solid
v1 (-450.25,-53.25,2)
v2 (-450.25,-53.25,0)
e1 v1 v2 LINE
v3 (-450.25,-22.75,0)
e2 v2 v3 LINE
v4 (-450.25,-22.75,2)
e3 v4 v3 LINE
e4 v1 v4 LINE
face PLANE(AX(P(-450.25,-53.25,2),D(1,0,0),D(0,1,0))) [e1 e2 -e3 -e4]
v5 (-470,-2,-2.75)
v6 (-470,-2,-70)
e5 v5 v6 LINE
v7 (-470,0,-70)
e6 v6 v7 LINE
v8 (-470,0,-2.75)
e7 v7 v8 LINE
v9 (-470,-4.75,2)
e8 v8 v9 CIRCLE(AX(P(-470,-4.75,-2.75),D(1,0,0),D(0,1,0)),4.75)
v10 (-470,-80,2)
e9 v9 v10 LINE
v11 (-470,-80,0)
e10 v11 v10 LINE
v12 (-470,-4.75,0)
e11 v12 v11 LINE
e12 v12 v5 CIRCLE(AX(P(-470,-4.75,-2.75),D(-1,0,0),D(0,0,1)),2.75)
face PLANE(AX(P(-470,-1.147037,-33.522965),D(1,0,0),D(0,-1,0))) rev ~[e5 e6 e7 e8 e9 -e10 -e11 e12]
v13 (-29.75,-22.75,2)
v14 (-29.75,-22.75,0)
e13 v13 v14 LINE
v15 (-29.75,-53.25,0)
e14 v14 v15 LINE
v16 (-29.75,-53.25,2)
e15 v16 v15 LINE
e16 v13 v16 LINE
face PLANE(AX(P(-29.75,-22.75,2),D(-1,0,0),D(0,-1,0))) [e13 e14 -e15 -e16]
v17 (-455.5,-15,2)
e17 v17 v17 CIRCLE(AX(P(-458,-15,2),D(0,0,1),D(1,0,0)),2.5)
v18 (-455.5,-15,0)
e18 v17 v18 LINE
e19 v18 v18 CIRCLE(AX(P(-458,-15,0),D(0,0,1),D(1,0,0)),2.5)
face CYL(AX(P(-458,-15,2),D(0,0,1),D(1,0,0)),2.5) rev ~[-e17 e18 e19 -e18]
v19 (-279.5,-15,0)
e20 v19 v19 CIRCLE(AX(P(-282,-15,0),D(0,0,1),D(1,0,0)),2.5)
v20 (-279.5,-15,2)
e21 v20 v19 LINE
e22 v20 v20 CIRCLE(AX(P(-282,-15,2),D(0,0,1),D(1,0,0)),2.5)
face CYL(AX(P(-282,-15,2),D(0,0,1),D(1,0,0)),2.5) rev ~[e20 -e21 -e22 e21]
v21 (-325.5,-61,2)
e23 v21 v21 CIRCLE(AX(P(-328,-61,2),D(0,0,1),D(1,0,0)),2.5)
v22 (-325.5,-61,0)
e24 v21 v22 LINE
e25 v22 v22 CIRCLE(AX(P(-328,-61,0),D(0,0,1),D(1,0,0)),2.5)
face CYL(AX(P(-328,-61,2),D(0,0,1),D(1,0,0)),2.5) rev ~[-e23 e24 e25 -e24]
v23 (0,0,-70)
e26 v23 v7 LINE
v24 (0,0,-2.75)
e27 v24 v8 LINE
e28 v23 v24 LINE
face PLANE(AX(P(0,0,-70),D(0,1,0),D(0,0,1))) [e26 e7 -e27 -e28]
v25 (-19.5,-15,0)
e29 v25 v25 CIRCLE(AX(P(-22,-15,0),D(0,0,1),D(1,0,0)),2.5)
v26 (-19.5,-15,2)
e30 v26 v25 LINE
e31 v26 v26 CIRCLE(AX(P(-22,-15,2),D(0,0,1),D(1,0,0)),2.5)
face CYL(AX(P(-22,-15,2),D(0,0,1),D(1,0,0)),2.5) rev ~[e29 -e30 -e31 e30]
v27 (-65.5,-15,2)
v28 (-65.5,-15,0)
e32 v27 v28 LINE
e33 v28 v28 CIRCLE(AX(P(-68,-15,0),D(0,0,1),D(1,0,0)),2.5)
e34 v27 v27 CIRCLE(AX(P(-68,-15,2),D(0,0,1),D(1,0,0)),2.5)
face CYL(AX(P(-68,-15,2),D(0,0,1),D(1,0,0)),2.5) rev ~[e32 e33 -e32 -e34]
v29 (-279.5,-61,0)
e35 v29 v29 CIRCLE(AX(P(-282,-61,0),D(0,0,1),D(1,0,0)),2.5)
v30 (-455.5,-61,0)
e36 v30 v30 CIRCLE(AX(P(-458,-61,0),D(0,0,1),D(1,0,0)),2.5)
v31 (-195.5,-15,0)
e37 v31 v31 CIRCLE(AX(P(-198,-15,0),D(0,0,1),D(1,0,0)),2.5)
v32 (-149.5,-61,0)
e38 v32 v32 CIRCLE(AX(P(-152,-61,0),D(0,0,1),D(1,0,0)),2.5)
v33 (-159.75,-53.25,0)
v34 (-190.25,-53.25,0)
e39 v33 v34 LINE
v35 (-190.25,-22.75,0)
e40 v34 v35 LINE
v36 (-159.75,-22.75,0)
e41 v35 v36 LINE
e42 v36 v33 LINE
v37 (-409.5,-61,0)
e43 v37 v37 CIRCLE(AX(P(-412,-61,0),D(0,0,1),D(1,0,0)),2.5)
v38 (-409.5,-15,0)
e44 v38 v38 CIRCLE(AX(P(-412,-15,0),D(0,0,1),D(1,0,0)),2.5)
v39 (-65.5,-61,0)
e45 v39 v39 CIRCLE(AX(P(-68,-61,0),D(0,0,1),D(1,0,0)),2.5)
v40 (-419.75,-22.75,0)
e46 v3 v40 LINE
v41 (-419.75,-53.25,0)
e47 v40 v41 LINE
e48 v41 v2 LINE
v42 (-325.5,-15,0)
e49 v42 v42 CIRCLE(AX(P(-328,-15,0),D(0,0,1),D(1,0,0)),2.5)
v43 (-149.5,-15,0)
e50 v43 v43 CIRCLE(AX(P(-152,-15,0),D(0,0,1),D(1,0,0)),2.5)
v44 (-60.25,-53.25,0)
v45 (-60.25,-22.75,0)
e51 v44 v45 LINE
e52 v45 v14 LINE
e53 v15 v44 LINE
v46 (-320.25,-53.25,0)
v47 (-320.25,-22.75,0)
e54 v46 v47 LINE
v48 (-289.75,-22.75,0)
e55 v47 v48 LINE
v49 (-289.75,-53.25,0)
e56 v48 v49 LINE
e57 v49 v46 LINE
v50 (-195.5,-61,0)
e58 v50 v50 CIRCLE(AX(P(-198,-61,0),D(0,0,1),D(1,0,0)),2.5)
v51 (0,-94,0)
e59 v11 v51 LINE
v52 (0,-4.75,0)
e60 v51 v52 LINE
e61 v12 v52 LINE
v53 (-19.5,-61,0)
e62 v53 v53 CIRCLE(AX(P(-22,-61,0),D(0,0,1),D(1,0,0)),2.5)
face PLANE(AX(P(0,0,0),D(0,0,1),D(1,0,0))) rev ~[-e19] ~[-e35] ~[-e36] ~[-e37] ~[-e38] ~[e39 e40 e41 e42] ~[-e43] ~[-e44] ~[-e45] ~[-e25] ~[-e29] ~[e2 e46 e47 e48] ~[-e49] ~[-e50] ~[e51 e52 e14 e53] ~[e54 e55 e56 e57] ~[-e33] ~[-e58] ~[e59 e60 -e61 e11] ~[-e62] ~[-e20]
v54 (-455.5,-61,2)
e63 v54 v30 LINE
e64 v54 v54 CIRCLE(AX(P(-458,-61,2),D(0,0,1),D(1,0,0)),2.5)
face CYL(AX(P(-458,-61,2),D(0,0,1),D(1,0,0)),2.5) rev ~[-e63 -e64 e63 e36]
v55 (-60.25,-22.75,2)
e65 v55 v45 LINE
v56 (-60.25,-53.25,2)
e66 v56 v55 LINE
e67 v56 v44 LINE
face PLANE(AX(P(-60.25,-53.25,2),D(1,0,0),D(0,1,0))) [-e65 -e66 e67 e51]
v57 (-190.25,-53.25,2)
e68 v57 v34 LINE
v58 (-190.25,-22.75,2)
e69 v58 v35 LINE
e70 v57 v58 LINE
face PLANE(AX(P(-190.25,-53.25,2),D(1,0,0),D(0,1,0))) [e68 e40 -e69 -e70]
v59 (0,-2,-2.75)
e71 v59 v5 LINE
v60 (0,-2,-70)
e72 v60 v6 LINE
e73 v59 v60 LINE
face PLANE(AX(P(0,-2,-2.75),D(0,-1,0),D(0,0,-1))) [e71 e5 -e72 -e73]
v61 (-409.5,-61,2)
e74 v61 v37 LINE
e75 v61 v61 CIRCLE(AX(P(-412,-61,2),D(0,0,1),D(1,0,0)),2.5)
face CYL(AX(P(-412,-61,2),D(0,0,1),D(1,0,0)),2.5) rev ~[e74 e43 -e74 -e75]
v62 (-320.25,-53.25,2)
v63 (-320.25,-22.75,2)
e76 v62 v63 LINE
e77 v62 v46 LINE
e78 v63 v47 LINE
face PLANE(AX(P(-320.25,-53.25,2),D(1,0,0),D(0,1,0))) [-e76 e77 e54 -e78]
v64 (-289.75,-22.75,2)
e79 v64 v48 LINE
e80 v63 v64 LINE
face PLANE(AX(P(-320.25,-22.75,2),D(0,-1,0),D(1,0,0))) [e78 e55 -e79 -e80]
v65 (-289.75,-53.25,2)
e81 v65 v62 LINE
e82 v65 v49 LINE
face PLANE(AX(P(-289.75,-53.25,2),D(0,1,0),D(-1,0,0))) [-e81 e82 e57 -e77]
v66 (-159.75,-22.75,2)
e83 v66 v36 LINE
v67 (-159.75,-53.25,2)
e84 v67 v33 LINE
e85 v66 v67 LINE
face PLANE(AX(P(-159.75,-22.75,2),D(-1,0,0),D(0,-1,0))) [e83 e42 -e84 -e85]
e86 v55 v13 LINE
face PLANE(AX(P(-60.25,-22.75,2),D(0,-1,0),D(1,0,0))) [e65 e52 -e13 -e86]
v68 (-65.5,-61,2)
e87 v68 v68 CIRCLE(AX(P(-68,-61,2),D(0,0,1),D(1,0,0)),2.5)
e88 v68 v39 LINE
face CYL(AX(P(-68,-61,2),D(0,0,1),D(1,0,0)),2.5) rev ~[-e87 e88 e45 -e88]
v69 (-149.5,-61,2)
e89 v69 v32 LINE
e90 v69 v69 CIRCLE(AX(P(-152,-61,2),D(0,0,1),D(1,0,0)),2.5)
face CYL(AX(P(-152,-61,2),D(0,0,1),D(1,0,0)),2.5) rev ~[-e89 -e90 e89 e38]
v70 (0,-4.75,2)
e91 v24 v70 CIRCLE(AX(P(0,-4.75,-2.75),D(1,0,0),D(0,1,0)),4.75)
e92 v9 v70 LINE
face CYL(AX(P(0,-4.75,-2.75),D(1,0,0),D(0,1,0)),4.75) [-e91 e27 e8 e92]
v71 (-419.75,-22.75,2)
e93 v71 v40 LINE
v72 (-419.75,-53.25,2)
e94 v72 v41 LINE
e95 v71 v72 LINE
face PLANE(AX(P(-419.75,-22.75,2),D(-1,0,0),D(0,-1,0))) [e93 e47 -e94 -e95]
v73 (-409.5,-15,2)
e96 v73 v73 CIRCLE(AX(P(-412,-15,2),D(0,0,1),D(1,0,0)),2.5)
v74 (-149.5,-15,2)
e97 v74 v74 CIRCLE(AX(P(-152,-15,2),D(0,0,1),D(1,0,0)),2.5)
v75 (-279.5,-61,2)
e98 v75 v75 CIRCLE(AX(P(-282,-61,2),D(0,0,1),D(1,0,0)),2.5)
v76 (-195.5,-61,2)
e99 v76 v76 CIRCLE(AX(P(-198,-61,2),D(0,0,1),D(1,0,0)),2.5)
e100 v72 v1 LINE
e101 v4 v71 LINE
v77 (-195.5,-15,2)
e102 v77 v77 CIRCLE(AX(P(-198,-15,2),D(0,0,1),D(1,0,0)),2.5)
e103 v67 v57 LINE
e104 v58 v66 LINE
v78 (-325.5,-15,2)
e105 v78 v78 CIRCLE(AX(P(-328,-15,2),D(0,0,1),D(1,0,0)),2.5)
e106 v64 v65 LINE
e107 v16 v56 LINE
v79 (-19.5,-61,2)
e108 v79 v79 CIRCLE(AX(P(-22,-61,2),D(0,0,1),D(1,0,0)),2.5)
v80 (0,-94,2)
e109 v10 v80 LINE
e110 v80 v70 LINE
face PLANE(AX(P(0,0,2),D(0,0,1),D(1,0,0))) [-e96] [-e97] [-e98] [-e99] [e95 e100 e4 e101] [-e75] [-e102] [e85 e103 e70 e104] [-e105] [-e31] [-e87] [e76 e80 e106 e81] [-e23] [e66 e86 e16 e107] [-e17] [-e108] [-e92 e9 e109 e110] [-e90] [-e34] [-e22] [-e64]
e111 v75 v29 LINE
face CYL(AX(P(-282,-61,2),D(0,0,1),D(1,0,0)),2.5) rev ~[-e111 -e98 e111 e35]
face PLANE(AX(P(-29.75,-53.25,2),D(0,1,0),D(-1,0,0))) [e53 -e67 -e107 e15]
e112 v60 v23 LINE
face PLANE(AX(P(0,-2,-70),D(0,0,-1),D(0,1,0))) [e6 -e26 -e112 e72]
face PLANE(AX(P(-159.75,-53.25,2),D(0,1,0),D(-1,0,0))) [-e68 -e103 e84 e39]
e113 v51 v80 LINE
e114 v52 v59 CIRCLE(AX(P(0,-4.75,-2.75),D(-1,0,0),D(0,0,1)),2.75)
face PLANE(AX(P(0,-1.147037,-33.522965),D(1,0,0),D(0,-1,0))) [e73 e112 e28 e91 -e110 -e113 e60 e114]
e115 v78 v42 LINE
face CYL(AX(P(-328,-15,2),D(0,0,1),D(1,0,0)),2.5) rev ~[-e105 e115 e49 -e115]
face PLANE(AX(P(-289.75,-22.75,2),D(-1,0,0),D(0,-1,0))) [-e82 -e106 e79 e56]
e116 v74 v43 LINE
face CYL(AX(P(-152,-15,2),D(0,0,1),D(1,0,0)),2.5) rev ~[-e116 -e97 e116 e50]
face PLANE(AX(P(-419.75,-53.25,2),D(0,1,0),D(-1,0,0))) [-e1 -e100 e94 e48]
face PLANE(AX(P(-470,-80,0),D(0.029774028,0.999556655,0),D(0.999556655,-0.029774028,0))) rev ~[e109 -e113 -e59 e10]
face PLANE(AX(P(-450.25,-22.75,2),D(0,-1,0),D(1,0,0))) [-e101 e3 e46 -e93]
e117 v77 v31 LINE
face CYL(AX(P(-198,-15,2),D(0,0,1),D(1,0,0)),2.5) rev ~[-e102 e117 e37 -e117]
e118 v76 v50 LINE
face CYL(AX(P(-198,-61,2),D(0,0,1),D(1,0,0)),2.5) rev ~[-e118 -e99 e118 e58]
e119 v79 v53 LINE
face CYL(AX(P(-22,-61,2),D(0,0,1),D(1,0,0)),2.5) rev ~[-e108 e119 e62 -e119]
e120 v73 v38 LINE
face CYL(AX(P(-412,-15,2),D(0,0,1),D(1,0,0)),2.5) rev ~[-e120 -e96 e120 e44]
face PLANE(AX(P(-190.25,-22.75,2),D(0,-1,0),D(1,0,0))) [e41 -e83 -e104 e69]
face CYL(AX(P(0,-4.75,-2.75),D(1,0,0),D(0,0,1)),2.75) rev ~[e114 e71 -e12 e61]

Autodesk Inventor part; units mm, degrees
ref_plane "YZ Plane" through (0, 0, 0) normal (1, 0, 0) x (0, 1, 0)
ref_plane "XZ Plane" through (0, 0, 0) normal (0, 1, 0) x (-1, 0, 0)
ref_plane "XY Plane" through (0, 0, 0) normal (0, 0, 1) x (1, 0, 0)
sketch "Sketch1" plane through (0, 0, 0) normal (0, 0, 1) x (1, 0, 0)
  line L0 (0, 0) -> (-470, 0)
  line L1 (0, -94) -> (0, 0)
  line L2 (-470, 0) -> (-470, -80)
  line L3 (-470, -80) -> (0, -94)
  point P0 (0, -47)
  dimension "d32" = 94
  dimension "d60" = 80
  dimension "d61" = 470
extrude "Plate1" add sketch "Sketch1" along normal blind 2
sketch "Sketch8" plane through (0, 0, 2) normal (0, 0, 1) x (1, 0, 0)
  line L0 (-29.75, -53.25) -> (-60.25, -53.25)
  line L1 (-60.25, -53.25) -> (-60.25, -22.75)
  line L2 (-60.25, -22.75) -> (-29.75, -22.75)
  line L3 (-29.75, -22.75) -> (-29.75, -53.25)
  line L4 (-29.75, -53.25) -> (-60.25, -22.75) construction
  line L5 (-60.25, -53.25) -> (-29.75, -22.75) construction
  circle A0 centre (-22, -61) radius 2.5
  circle A1 centre (-68, -61) radius 2.5
  circle A2 centre (-68, -15) radius 2.5
  circle A3 centre (-22, -15) radius 2.5
  line L6 (0, 0) -> (0, -94) projected
  line L7 (-470, 0) -> (0, 0) projected
  line L8 (-60.25, -53.25) -> (-68, -61) construction
  line L9 (-68, -15) -> (-22, -15) construction
  line L10 (-22, -15) -> (-22, -61) construction
  line L11 (-22, -61) -> (-68, -61) construction
  line L12 (-68, -61) -> (-68, -15) construction
  point P0 (-45, -38)
  dimension "d51" = 30.5
  dimension "d52" = 30.5
  dimension "d53" = 5
  dimension "d72" = 45
  dimension "d78" = 46
  dimension "d79" = 15
extrude "Cut3" cut sketch "Sketch8" against normal blind 2
pattern_linear "Rectangular Pattern1" count 4 spacing 130 along (-1, 0, 0) of "Cut3"
sketch "Sketch9" plane through (0, -2, 2) normal (0, 1, 0) x (-1, 0, 0)
  line L0 (470, 0) -> (0, 0)
  line L1 (0, 0) -> (0, -72)
  line L2 (0, -72) -> (470, -72)
  line L3 (470, -72) -> (470, 0)
edge flange "Flange3" height 72 angle 90 thickness 2 bend radius 2.75 thickness toward (0, 1, 0) relief round relief width 2 relief depth 1 edges at (-235, 0, 0) wall of the first edge with corners at (-470, -2, 2) (0, -2, 2) (0, -2, -70) (-470, -2, -70)
bend "Bend3"
corner "Corner3"
equation "\"d51\" = d52"
equation "\"d55\" = Thickness"
equation "\"d2\" = Thickness"
equation "\"d62\" = BendReliefWidth"
equation "\"d63\" = BendReliefDepth"
equation "\"d64\" = MinimumRemnant"
equation "\"d65\" = TransitionRadius"
equation "\"d68\" = BendRadius"
equation "\"d69\" = CornerReliefSize"
equation "\"d70\" = GapSize"
equation "\"d71\" = JacobiRadiusSize"
equation "\"BendReliefWidth\" = Thickness"
equation "\"BendReliefDepth\" = 0.5 * Thickness"
equation "\"CornerReliefSize\" = 4 * Thickness"
equation "\"MinimumRemnant\" = 2 * Thickness"
equation "\"TransitionRadius\" = BendRadius"
equation "\"JacobiRadiusSize\" = BendRadius"
equation "\"GapSize\" = Thickness"
equation "\"Thickness\" = 2"
equation "\"BendRadius\" = 2.75"
properties part number "PRS 1422 DrSysB diameter way up_1200" material "Stainless Steel"
